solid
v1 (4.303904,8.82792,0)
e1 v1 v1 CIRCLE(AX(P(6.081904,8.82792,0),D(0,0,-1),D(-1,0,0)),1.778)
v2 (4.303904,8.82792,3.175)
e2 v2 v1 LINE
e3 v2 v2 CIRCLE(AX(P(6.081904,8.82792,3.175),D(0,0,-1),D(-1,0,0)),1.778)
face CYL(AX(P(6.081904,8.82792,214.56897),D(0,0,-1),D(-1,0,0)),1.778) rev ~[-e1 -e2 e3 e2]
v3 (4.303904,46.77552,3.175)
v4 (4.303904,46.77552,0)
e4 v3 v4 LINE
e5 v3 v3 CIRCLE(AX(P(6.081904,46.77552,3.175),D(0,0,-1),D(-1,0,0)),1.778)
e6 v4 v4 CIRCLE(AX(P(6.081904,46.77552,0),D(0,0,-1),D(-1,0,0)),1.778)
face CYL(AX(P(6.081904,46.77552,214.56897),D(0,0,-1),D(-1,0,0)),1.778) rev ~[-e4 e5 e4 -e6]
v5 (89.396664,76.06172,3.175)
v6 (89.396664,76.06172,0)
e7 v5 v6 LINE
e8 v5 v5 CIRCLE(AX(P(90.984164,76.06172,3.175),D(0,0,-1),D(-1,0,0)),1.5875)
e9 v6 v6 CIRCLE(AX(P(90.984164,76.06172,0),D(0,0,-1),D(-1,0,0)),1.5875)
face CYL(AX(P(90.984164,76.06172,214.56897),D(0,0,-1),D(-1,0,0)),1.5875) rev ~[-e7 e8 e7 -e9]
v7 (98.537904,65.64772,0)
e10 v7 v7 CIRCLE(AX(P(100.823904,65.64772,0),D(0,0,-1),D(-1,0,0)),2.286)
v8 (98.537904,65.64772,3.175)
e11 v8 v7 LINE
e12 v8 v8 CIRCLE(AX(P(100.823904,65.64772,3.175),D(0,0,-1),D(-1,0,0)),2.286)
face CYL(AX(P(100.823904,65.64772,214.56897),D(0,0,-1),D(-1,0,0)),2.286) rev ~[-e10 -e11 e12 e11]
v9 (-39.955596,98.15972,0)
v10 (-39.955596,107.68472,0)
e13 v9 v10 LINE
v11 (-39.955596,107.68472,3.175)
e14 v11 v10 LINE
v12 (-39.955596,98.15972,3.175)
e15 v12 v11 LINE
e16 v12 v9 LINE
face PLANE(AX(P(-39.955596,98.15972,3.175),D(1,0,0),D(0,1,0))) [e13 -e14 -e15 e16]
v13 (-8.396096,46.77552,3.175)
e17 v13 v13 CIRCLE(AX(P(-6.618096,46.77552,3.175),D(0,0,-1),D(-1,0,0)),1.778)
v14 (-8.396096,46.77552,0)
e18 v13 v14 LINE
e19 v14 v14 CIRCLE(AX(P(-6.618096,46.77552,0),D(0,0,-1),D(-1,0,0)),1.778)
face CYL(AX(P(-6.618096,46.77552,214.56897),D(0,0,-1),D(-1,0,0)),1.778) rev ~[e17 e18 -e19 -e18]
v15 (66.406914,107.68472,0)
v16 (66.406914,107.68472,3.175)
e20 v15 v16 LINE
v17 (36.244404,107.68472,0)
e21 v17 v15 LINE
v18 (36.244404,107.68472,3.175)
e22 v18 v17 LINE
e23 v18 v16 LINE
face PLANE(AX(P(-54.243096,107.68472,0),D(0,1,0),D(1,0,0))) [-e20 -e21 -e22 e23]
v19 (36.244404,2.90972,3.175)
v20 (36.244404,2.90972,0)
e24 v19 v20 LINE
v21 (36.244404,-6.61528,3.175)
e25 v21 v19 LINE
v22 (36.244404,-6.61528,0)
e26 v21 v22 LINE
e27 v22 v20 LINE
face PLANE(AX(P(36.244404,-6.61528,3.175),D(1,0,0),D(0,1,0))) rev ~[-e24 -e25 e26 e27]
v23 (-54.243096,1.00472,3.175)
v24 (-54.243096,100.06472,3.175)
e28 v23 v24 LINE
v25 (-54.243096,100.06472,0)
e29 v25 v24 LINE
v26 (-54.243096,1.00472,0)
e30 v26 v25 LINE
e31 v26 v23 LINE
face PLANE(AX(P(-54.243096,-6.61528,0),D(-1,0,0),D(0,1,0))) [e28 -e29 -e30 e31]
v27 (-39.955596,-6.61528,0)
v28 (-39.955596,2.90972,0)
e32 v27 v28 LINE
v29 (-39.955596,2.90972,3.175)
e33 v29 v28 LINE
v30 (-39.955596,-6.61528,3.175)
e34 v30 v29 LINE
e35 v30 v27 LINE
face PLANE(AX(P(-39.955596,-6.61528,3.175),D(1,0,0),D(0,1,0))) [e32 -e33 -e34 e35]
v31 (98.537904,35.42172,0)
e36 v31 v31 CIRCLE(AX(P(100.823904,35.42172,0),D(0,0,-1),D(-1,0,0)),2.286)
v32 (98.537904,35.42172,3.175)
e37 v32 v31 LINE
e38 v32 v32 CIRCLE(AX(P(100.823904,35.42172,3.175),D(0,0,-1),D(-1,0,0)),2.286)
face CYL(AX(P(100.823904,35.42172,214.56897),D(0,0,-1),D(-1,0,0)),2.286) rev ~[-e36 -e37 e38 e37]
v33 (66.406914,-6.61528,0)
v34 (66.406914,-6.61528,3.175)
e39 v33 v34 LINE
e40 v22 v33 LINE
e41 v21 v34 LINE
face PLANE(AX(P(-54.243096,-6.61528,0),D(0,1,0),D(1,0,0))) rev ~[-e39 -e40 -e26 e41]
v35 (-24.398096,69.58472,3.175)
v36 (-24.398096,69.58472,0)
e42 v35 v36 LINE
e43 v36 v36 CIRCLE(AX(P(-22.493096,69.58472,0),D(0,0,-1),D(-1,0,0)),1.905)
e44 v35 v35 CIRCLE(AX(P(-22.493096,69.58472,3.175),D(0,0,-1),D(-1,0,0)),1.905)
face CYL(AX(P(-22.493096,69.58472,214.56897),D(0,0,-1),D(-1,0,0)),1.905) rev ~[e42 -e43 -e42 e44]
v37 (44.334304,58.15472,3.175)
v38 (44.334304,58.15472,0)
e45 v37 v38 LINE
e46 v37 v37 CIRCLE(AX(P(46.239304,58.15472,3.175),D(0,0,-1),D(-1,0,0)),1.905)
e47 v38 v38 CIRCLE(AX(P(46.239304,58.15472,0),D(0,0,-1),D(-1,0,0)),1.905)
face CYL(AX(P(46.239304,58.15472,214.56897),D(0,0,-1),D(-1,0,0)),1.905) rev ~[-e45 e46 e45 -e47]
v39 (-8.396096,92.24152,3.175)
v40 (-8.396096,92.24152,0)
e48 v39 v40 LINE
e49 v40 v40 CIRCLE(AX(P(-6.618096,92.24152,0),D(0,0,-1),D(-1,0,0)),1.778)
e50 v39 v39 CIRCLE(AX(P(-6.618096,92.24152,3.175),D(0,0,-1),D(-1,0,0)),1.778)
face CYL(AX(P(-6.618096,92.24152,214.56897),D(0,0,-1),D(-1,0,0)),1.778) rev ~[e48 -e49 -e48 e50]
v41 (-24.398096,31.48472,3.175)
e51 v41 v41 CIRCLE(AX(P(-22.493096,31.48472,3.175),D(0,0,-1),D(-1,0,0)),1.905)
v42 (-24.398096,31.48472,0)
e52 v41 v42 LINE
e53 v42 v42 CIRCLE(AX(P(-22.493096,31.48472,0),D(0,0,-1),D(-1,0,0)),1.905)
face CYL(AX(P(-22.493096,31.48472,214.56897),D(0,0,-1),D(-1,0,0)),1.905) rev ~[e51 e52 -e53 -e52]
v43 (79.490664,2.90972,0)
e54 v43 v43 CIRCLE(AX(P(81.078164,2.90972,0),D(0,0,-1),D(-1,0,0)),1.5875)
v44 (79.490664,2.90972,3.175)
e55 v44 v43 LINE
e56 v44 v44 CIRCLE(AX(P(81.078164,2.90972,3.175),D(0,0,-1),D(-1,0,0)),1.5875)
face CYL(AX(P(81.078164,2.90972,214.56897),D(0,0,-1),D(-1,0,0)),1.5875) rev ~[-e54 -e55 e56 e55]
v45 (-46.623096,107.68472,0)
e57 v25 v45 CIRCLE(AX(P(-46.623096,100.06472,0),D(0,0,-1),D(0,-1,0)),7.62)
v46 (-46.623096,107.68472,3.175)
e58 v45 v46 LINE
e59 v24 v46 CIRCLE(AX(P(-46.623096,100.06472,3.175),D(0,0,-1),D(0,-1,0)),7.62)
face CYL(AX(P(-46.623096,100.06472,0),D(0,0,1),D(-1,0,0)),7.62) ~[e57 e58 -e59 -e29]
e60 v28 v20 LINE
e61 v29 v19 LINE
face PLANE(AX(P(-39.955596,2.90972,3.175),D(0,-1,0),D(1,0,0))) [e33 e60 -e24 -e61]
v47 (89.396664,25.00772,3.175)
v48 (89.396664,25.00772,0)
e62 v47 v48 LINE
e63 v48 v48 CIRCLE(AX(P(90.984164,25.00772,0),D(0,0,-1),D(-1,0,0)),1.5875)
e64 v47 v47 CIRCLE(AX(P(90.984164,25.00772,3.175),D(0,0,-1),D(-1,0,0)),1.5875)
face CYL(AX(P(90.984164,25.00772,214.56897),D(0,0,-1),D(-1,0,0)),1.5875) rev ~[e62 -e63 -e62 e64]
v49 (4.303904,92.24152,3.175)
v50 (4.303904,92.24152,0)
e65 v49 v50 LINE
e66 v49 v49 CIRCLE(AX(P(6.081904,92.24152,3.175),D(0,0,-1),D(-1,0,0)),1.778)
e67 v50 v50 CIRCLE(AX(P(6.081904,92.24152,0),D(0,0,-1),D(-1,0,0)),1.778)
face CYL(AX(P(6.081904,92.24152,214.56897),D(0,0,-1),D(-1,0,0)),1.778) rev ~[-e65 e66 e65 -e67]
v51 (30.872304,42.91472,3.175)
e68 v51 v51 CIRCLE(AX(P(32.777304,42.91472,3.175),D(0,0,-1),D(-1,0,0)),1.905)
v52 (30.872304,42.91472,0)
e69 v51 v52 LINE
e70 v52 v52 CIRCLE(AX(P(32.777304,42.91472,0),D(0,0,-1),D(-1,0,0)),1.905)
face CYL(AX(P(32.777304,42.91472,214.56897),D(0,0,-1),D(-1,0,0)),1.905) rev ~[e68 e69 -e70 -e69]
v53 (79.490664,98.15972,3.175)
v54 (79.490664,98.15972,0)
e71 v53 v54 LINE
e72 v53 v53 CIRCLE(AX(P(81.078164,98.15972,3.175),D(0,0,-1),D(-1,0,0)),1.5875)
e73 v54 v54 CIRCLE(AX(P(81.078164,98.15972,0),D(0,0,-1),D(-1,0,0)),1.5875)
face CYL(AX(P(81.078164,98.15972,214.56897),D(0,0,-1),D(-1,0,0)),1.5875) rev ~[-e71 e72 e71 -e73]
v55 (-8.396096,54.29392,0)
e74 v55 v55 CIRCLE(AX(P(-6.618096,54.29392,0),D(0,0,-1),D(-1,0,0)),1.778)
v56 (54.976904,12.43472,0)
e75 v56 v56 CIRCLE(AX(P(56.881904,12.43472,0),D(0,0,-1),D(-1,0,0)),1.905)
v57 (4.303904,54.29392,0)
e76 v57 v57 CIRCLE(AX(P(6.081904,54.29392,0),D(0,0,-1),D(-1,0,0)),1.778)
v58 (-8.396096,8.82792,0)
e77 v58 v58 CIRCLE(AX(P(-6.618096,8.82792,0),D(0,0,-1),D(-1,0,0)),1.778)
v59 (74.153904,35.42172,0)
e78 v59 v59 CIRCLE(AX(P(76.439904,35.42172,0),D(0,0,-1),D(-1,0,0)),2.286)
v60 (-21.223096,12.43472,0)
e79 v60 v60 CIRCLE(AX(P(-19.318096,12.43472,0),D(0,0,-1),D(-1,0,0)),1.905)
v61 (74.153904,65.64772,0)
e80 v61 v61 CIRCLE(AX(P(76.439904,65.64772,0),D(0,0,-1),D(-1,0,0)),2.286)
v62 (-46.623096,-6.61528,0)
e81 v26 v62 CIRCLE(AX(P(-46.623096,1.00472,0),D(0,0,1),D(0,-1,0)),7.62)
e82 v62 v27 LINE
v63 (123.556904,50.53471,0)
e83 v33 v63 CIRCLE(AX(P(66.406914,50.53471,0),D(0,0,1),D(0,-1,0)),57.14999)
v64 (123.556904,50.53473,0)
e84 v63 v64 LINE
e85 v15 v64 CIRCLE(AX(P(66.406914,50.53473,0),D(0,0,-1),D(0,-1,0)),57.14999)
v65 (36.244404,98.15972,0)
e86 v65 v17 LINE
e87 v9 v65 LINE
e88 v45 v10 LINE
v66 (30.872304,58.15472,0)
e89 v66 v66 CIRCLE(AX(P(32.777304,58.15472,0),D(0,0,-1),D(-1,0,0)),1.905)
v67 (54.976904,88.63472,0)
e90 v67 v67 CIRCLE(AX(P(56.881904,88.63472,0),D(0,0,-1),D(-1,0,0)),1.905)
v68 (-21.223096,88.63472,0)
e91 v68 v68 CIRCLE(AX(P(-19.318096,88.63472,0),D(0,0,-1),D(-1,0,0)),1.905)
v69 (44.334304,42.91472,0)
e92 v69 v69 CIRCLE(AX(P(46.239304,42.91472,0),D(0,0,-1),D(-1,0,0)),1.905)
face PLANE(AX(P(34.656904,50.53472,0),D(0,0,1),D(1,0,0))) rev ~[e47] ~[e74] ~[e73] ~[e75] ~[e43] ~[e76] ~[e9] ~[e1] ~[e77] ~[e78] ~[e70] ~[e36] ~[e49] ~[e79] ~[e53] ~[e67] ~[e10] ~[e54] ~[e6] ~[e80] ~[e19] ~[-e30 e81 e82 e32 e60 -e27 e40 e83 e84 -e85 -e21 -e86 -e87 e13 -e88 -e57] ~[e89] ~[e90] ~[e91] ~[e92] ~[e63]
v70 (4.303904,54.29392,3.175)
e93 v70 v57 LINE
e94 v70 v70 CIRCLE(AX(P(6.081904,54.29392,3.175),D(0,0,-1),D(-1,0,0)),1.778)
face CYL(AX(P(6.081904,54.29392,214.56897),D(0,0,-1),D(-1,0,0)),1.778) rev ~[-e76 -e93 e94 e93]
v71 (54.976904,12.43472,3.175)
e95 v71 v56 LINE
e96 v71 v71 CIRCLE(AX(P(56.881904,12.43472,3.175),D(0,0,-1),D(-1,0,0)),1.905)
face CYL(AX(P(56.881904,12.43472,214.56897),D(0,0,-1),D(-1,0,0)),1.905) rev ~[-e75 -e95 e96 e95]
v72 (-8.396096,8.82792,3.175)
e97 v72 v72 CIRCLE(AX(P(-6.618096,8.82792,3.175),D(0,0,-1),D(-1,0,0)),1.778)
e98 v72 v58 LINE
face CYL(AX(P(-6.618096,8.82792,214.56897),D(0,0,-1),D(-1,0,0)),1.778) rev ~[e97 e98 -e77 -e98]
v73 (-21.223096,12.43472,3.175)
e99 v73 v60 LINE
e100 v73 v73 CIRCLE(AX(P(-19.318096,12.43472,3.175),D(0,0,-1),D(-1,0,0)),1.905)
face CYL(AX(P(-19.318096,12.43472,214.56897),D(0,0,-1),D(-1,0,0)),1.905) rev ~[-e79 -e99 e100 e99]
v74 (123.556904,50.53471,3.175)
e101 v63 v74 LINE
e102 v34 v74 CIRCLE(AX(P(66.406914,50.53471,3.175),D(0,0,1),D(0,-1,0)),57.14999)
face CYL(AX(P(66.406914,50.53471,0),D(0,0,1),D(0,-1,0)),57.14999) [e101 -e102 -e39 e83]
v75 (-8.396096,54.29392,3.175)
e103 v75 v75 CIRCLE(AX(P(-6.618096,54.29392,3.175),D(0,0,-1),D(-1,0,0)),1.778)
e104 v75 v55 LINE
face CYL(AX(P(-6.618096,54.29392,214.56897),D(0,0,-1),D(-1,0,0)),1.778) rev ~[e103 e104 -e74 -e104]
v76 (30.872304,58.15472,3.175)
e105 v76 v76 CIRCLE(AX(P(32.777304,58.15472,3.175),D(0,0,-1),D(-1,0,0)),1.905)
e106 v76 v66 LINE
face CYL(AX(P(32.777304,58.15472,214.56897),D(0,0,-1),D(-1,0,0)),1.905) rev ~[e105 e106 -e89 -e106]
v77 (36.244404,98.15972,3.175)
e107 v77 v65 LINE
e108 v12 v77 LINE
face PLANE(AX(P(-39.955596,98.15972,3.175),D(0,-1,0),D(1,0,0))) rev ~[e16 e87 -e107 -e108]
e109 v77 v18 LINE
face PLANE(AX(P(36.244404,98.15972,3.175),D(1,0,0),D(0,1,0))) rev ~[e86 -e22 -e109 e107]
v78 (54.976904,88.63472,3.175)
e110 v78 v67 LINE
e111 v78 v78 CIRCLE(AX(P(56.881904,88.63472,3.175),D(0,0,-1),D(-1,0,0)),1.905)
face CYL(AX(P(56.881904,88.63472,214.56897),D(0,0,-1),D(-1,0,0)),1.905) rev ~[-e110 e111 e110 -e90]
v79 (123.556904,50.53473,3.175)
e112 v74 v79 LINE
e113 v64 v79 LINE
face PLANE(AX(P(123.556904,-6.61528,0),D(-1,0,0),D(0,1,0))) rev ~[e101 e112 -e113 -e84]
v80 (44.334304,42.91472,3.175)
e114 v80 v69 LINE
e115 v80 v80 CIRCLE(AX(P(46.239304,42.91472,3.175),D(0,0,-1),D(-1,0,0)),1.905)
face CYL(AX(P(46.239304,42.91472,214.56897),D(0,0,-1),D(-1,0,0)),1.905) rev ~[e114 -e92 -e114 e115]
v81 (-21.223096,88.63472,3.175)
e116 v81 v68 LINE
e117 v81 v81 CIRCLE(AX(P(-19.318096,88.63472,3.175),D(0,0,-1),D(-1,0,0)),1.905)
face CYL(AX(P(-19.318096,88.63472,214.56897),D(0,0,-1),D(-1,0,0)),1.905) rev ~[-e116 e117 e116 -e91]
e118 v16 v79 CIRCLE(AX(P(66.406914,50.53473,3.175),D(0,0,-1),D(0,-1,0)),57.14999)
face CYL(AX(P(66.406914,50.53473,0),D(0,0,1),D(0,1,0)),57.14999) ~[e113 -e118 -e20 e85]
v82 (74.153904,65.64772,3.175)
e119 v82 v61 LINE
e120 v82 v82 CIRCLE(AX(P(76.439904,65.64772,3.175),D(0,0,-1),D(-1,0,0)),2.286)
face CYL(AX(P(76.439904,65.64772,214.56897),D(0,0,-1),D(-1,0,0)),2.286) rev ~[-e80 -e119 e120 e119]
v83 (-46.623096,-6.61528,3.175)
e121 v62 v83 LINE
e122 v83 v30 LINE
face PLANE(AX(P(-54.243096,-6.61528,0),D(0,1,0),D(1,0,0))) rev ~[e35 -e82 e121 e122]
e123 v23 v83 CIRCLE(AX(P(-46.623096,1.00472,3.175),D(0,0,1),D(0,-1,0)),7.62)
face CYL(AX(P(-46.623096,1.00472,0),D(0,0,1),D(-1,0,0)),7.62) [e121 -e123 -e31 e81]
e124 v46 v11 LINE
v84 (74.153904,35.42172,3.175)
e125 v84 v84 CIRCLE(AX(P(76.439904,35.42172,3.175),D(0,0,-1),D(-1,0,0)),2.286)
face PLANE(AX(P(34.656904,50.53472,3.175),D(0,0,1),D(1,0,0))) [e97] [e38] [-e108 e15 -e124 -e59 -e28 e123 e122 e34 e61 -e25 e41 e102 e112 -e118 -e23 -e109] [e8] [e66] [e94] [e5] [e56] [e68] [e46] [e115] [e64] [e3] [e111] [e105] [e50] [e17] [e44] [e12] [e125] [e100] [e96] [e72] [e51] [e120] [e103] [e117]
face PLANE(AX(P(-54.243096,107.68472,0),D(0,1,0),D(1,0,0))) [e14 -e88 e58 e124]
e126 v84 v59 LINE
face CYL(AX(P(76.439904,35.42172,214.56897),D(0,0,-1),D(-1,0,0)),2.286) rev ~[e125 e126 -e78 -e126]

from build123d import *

# Parameters (mm, degrees)
F0_W     = 177.8
F0_H     = 114.3
F1_DEPTH = 3.175
F2_R     = 7.62
F3_W     = 76.2
F3_H     = 9.525
F4_DEPTH = 25.4
F6_D     = 3.556
F8_D     = 3.81
F11_D    = 3.81
F13_D    = 4.572
F15_D    = 3.81
F16_R    = 57.14999
F18_D    = 3.175


# Not quite as in the source:
# - a fillet or chamfer is up to 0.001 mm smaller than in the source, because OpenCascade refuses the exact size


with BuildPart() as f1:
    # F0 (on Top) → F1 (new body)
    with BuildSketch(Plane.XY):
        with Locations((34.6569041669, 50.5347196277)):
            Rectangle(F0_W, F0_H)
    extrude(amount=F1_DEPTH)

    # F2
    f2_edges = [f1.edges().sort_by_distance(p)[0] for p in [
        (-54.243096, 107.68472, 1.5875),
        (-54.243096, -6.61528, 1.5875),
    ]]
    fillet(f2_edges, radius=F2_R)

    # F3 (on face) → F4 (cut)
    with BuildSketch(Plane.XY.offset(3.175)):
        with Locations((-1.8555958331, -1.8527803723)):
            Rectangle(F3_W, F3_H)
        with Locations((-1.8555958331, 102.9222196277)):
            Rectangle(F3_W, F3_H)
    extrude(amount=-F4_DEPTH, mode=Mode.SUBTRACT)

    # F6 (through all)
    with Locations(Plane.XY.offset(3.175)):
        with Locations((-6.6180958331, 8.8279196277), (-6.6180958331, 46.7755196277), (-6.6180958331, 54.2939196277), (-6.6180958331, 92.2415196277), (6.0819041669, 8.8279196277), (6.0819041669, 46.7755196277), (6.0819041669, 54.2939196277), (6.0819041669, 92.2415196277)):
            Hole(F6_D / 2)

    # F8 (through all)
    with Locations(Plane.XY.offset(3.175)):
        with Locations((32.7773041669, 42.9147196277), (46.2393041669, 42.9147196277), (46.2393041669, 58.1547196277), (32.7773041669, 58.1547196277)):
            Hole(F8_D / 2)

    # F11 (through all)
    with Locations(Plane.XY.offset(3.175)):
        with Locations((-22.4930958331, 31.4847196277), (-22.4930958331, 69.5847196277)):
            Hole(F11_D / 2)

    # F13 (through all)
    with Locations(Plane.XY.offset(3.175)):
        with Locations((76.4399041669, 65.6477196277), (76.4399041669, 35.4217196277), (100.8239041669, 35.4217196277), (100.8239041669, 65.6477196277)):
            Hole(F13_D / 2)

    # F15 (through all)
    with Locations(Plane.XY.offset(3.175)):
        with Locations((-19.3180958331, 12.4347196277), (-19.3180958331, 88.6347196277), (56.8819041669, 88.6347196277), (56.8819041669, 12.4347196277)):
            Hole(F15_D / 2)

    # F16 (radius 57.15 in the source; OpenCascade refuses exactly that, so slightly less here)
    f16_edges = [f1.edges().sort_by_distance(p)[0] for p in [
        (123.556904, -6.61528, 1.5875),
        (123.556904, 107.68472, 1.5875),
    ]]
    fillet(f16_edges, radius=F16_R)

    # F18 (through all)
    with Locations(Plane.XY.offset(3.175)):
        with Locations((81.0781642795, 2.9097196277), (90.9841642795, 25.0077196277), (90.9841642795, 76.0617196277), (81.0781642795, 98.1597196277)):
            Hole(F18_D / 2)


solid = f1.part
